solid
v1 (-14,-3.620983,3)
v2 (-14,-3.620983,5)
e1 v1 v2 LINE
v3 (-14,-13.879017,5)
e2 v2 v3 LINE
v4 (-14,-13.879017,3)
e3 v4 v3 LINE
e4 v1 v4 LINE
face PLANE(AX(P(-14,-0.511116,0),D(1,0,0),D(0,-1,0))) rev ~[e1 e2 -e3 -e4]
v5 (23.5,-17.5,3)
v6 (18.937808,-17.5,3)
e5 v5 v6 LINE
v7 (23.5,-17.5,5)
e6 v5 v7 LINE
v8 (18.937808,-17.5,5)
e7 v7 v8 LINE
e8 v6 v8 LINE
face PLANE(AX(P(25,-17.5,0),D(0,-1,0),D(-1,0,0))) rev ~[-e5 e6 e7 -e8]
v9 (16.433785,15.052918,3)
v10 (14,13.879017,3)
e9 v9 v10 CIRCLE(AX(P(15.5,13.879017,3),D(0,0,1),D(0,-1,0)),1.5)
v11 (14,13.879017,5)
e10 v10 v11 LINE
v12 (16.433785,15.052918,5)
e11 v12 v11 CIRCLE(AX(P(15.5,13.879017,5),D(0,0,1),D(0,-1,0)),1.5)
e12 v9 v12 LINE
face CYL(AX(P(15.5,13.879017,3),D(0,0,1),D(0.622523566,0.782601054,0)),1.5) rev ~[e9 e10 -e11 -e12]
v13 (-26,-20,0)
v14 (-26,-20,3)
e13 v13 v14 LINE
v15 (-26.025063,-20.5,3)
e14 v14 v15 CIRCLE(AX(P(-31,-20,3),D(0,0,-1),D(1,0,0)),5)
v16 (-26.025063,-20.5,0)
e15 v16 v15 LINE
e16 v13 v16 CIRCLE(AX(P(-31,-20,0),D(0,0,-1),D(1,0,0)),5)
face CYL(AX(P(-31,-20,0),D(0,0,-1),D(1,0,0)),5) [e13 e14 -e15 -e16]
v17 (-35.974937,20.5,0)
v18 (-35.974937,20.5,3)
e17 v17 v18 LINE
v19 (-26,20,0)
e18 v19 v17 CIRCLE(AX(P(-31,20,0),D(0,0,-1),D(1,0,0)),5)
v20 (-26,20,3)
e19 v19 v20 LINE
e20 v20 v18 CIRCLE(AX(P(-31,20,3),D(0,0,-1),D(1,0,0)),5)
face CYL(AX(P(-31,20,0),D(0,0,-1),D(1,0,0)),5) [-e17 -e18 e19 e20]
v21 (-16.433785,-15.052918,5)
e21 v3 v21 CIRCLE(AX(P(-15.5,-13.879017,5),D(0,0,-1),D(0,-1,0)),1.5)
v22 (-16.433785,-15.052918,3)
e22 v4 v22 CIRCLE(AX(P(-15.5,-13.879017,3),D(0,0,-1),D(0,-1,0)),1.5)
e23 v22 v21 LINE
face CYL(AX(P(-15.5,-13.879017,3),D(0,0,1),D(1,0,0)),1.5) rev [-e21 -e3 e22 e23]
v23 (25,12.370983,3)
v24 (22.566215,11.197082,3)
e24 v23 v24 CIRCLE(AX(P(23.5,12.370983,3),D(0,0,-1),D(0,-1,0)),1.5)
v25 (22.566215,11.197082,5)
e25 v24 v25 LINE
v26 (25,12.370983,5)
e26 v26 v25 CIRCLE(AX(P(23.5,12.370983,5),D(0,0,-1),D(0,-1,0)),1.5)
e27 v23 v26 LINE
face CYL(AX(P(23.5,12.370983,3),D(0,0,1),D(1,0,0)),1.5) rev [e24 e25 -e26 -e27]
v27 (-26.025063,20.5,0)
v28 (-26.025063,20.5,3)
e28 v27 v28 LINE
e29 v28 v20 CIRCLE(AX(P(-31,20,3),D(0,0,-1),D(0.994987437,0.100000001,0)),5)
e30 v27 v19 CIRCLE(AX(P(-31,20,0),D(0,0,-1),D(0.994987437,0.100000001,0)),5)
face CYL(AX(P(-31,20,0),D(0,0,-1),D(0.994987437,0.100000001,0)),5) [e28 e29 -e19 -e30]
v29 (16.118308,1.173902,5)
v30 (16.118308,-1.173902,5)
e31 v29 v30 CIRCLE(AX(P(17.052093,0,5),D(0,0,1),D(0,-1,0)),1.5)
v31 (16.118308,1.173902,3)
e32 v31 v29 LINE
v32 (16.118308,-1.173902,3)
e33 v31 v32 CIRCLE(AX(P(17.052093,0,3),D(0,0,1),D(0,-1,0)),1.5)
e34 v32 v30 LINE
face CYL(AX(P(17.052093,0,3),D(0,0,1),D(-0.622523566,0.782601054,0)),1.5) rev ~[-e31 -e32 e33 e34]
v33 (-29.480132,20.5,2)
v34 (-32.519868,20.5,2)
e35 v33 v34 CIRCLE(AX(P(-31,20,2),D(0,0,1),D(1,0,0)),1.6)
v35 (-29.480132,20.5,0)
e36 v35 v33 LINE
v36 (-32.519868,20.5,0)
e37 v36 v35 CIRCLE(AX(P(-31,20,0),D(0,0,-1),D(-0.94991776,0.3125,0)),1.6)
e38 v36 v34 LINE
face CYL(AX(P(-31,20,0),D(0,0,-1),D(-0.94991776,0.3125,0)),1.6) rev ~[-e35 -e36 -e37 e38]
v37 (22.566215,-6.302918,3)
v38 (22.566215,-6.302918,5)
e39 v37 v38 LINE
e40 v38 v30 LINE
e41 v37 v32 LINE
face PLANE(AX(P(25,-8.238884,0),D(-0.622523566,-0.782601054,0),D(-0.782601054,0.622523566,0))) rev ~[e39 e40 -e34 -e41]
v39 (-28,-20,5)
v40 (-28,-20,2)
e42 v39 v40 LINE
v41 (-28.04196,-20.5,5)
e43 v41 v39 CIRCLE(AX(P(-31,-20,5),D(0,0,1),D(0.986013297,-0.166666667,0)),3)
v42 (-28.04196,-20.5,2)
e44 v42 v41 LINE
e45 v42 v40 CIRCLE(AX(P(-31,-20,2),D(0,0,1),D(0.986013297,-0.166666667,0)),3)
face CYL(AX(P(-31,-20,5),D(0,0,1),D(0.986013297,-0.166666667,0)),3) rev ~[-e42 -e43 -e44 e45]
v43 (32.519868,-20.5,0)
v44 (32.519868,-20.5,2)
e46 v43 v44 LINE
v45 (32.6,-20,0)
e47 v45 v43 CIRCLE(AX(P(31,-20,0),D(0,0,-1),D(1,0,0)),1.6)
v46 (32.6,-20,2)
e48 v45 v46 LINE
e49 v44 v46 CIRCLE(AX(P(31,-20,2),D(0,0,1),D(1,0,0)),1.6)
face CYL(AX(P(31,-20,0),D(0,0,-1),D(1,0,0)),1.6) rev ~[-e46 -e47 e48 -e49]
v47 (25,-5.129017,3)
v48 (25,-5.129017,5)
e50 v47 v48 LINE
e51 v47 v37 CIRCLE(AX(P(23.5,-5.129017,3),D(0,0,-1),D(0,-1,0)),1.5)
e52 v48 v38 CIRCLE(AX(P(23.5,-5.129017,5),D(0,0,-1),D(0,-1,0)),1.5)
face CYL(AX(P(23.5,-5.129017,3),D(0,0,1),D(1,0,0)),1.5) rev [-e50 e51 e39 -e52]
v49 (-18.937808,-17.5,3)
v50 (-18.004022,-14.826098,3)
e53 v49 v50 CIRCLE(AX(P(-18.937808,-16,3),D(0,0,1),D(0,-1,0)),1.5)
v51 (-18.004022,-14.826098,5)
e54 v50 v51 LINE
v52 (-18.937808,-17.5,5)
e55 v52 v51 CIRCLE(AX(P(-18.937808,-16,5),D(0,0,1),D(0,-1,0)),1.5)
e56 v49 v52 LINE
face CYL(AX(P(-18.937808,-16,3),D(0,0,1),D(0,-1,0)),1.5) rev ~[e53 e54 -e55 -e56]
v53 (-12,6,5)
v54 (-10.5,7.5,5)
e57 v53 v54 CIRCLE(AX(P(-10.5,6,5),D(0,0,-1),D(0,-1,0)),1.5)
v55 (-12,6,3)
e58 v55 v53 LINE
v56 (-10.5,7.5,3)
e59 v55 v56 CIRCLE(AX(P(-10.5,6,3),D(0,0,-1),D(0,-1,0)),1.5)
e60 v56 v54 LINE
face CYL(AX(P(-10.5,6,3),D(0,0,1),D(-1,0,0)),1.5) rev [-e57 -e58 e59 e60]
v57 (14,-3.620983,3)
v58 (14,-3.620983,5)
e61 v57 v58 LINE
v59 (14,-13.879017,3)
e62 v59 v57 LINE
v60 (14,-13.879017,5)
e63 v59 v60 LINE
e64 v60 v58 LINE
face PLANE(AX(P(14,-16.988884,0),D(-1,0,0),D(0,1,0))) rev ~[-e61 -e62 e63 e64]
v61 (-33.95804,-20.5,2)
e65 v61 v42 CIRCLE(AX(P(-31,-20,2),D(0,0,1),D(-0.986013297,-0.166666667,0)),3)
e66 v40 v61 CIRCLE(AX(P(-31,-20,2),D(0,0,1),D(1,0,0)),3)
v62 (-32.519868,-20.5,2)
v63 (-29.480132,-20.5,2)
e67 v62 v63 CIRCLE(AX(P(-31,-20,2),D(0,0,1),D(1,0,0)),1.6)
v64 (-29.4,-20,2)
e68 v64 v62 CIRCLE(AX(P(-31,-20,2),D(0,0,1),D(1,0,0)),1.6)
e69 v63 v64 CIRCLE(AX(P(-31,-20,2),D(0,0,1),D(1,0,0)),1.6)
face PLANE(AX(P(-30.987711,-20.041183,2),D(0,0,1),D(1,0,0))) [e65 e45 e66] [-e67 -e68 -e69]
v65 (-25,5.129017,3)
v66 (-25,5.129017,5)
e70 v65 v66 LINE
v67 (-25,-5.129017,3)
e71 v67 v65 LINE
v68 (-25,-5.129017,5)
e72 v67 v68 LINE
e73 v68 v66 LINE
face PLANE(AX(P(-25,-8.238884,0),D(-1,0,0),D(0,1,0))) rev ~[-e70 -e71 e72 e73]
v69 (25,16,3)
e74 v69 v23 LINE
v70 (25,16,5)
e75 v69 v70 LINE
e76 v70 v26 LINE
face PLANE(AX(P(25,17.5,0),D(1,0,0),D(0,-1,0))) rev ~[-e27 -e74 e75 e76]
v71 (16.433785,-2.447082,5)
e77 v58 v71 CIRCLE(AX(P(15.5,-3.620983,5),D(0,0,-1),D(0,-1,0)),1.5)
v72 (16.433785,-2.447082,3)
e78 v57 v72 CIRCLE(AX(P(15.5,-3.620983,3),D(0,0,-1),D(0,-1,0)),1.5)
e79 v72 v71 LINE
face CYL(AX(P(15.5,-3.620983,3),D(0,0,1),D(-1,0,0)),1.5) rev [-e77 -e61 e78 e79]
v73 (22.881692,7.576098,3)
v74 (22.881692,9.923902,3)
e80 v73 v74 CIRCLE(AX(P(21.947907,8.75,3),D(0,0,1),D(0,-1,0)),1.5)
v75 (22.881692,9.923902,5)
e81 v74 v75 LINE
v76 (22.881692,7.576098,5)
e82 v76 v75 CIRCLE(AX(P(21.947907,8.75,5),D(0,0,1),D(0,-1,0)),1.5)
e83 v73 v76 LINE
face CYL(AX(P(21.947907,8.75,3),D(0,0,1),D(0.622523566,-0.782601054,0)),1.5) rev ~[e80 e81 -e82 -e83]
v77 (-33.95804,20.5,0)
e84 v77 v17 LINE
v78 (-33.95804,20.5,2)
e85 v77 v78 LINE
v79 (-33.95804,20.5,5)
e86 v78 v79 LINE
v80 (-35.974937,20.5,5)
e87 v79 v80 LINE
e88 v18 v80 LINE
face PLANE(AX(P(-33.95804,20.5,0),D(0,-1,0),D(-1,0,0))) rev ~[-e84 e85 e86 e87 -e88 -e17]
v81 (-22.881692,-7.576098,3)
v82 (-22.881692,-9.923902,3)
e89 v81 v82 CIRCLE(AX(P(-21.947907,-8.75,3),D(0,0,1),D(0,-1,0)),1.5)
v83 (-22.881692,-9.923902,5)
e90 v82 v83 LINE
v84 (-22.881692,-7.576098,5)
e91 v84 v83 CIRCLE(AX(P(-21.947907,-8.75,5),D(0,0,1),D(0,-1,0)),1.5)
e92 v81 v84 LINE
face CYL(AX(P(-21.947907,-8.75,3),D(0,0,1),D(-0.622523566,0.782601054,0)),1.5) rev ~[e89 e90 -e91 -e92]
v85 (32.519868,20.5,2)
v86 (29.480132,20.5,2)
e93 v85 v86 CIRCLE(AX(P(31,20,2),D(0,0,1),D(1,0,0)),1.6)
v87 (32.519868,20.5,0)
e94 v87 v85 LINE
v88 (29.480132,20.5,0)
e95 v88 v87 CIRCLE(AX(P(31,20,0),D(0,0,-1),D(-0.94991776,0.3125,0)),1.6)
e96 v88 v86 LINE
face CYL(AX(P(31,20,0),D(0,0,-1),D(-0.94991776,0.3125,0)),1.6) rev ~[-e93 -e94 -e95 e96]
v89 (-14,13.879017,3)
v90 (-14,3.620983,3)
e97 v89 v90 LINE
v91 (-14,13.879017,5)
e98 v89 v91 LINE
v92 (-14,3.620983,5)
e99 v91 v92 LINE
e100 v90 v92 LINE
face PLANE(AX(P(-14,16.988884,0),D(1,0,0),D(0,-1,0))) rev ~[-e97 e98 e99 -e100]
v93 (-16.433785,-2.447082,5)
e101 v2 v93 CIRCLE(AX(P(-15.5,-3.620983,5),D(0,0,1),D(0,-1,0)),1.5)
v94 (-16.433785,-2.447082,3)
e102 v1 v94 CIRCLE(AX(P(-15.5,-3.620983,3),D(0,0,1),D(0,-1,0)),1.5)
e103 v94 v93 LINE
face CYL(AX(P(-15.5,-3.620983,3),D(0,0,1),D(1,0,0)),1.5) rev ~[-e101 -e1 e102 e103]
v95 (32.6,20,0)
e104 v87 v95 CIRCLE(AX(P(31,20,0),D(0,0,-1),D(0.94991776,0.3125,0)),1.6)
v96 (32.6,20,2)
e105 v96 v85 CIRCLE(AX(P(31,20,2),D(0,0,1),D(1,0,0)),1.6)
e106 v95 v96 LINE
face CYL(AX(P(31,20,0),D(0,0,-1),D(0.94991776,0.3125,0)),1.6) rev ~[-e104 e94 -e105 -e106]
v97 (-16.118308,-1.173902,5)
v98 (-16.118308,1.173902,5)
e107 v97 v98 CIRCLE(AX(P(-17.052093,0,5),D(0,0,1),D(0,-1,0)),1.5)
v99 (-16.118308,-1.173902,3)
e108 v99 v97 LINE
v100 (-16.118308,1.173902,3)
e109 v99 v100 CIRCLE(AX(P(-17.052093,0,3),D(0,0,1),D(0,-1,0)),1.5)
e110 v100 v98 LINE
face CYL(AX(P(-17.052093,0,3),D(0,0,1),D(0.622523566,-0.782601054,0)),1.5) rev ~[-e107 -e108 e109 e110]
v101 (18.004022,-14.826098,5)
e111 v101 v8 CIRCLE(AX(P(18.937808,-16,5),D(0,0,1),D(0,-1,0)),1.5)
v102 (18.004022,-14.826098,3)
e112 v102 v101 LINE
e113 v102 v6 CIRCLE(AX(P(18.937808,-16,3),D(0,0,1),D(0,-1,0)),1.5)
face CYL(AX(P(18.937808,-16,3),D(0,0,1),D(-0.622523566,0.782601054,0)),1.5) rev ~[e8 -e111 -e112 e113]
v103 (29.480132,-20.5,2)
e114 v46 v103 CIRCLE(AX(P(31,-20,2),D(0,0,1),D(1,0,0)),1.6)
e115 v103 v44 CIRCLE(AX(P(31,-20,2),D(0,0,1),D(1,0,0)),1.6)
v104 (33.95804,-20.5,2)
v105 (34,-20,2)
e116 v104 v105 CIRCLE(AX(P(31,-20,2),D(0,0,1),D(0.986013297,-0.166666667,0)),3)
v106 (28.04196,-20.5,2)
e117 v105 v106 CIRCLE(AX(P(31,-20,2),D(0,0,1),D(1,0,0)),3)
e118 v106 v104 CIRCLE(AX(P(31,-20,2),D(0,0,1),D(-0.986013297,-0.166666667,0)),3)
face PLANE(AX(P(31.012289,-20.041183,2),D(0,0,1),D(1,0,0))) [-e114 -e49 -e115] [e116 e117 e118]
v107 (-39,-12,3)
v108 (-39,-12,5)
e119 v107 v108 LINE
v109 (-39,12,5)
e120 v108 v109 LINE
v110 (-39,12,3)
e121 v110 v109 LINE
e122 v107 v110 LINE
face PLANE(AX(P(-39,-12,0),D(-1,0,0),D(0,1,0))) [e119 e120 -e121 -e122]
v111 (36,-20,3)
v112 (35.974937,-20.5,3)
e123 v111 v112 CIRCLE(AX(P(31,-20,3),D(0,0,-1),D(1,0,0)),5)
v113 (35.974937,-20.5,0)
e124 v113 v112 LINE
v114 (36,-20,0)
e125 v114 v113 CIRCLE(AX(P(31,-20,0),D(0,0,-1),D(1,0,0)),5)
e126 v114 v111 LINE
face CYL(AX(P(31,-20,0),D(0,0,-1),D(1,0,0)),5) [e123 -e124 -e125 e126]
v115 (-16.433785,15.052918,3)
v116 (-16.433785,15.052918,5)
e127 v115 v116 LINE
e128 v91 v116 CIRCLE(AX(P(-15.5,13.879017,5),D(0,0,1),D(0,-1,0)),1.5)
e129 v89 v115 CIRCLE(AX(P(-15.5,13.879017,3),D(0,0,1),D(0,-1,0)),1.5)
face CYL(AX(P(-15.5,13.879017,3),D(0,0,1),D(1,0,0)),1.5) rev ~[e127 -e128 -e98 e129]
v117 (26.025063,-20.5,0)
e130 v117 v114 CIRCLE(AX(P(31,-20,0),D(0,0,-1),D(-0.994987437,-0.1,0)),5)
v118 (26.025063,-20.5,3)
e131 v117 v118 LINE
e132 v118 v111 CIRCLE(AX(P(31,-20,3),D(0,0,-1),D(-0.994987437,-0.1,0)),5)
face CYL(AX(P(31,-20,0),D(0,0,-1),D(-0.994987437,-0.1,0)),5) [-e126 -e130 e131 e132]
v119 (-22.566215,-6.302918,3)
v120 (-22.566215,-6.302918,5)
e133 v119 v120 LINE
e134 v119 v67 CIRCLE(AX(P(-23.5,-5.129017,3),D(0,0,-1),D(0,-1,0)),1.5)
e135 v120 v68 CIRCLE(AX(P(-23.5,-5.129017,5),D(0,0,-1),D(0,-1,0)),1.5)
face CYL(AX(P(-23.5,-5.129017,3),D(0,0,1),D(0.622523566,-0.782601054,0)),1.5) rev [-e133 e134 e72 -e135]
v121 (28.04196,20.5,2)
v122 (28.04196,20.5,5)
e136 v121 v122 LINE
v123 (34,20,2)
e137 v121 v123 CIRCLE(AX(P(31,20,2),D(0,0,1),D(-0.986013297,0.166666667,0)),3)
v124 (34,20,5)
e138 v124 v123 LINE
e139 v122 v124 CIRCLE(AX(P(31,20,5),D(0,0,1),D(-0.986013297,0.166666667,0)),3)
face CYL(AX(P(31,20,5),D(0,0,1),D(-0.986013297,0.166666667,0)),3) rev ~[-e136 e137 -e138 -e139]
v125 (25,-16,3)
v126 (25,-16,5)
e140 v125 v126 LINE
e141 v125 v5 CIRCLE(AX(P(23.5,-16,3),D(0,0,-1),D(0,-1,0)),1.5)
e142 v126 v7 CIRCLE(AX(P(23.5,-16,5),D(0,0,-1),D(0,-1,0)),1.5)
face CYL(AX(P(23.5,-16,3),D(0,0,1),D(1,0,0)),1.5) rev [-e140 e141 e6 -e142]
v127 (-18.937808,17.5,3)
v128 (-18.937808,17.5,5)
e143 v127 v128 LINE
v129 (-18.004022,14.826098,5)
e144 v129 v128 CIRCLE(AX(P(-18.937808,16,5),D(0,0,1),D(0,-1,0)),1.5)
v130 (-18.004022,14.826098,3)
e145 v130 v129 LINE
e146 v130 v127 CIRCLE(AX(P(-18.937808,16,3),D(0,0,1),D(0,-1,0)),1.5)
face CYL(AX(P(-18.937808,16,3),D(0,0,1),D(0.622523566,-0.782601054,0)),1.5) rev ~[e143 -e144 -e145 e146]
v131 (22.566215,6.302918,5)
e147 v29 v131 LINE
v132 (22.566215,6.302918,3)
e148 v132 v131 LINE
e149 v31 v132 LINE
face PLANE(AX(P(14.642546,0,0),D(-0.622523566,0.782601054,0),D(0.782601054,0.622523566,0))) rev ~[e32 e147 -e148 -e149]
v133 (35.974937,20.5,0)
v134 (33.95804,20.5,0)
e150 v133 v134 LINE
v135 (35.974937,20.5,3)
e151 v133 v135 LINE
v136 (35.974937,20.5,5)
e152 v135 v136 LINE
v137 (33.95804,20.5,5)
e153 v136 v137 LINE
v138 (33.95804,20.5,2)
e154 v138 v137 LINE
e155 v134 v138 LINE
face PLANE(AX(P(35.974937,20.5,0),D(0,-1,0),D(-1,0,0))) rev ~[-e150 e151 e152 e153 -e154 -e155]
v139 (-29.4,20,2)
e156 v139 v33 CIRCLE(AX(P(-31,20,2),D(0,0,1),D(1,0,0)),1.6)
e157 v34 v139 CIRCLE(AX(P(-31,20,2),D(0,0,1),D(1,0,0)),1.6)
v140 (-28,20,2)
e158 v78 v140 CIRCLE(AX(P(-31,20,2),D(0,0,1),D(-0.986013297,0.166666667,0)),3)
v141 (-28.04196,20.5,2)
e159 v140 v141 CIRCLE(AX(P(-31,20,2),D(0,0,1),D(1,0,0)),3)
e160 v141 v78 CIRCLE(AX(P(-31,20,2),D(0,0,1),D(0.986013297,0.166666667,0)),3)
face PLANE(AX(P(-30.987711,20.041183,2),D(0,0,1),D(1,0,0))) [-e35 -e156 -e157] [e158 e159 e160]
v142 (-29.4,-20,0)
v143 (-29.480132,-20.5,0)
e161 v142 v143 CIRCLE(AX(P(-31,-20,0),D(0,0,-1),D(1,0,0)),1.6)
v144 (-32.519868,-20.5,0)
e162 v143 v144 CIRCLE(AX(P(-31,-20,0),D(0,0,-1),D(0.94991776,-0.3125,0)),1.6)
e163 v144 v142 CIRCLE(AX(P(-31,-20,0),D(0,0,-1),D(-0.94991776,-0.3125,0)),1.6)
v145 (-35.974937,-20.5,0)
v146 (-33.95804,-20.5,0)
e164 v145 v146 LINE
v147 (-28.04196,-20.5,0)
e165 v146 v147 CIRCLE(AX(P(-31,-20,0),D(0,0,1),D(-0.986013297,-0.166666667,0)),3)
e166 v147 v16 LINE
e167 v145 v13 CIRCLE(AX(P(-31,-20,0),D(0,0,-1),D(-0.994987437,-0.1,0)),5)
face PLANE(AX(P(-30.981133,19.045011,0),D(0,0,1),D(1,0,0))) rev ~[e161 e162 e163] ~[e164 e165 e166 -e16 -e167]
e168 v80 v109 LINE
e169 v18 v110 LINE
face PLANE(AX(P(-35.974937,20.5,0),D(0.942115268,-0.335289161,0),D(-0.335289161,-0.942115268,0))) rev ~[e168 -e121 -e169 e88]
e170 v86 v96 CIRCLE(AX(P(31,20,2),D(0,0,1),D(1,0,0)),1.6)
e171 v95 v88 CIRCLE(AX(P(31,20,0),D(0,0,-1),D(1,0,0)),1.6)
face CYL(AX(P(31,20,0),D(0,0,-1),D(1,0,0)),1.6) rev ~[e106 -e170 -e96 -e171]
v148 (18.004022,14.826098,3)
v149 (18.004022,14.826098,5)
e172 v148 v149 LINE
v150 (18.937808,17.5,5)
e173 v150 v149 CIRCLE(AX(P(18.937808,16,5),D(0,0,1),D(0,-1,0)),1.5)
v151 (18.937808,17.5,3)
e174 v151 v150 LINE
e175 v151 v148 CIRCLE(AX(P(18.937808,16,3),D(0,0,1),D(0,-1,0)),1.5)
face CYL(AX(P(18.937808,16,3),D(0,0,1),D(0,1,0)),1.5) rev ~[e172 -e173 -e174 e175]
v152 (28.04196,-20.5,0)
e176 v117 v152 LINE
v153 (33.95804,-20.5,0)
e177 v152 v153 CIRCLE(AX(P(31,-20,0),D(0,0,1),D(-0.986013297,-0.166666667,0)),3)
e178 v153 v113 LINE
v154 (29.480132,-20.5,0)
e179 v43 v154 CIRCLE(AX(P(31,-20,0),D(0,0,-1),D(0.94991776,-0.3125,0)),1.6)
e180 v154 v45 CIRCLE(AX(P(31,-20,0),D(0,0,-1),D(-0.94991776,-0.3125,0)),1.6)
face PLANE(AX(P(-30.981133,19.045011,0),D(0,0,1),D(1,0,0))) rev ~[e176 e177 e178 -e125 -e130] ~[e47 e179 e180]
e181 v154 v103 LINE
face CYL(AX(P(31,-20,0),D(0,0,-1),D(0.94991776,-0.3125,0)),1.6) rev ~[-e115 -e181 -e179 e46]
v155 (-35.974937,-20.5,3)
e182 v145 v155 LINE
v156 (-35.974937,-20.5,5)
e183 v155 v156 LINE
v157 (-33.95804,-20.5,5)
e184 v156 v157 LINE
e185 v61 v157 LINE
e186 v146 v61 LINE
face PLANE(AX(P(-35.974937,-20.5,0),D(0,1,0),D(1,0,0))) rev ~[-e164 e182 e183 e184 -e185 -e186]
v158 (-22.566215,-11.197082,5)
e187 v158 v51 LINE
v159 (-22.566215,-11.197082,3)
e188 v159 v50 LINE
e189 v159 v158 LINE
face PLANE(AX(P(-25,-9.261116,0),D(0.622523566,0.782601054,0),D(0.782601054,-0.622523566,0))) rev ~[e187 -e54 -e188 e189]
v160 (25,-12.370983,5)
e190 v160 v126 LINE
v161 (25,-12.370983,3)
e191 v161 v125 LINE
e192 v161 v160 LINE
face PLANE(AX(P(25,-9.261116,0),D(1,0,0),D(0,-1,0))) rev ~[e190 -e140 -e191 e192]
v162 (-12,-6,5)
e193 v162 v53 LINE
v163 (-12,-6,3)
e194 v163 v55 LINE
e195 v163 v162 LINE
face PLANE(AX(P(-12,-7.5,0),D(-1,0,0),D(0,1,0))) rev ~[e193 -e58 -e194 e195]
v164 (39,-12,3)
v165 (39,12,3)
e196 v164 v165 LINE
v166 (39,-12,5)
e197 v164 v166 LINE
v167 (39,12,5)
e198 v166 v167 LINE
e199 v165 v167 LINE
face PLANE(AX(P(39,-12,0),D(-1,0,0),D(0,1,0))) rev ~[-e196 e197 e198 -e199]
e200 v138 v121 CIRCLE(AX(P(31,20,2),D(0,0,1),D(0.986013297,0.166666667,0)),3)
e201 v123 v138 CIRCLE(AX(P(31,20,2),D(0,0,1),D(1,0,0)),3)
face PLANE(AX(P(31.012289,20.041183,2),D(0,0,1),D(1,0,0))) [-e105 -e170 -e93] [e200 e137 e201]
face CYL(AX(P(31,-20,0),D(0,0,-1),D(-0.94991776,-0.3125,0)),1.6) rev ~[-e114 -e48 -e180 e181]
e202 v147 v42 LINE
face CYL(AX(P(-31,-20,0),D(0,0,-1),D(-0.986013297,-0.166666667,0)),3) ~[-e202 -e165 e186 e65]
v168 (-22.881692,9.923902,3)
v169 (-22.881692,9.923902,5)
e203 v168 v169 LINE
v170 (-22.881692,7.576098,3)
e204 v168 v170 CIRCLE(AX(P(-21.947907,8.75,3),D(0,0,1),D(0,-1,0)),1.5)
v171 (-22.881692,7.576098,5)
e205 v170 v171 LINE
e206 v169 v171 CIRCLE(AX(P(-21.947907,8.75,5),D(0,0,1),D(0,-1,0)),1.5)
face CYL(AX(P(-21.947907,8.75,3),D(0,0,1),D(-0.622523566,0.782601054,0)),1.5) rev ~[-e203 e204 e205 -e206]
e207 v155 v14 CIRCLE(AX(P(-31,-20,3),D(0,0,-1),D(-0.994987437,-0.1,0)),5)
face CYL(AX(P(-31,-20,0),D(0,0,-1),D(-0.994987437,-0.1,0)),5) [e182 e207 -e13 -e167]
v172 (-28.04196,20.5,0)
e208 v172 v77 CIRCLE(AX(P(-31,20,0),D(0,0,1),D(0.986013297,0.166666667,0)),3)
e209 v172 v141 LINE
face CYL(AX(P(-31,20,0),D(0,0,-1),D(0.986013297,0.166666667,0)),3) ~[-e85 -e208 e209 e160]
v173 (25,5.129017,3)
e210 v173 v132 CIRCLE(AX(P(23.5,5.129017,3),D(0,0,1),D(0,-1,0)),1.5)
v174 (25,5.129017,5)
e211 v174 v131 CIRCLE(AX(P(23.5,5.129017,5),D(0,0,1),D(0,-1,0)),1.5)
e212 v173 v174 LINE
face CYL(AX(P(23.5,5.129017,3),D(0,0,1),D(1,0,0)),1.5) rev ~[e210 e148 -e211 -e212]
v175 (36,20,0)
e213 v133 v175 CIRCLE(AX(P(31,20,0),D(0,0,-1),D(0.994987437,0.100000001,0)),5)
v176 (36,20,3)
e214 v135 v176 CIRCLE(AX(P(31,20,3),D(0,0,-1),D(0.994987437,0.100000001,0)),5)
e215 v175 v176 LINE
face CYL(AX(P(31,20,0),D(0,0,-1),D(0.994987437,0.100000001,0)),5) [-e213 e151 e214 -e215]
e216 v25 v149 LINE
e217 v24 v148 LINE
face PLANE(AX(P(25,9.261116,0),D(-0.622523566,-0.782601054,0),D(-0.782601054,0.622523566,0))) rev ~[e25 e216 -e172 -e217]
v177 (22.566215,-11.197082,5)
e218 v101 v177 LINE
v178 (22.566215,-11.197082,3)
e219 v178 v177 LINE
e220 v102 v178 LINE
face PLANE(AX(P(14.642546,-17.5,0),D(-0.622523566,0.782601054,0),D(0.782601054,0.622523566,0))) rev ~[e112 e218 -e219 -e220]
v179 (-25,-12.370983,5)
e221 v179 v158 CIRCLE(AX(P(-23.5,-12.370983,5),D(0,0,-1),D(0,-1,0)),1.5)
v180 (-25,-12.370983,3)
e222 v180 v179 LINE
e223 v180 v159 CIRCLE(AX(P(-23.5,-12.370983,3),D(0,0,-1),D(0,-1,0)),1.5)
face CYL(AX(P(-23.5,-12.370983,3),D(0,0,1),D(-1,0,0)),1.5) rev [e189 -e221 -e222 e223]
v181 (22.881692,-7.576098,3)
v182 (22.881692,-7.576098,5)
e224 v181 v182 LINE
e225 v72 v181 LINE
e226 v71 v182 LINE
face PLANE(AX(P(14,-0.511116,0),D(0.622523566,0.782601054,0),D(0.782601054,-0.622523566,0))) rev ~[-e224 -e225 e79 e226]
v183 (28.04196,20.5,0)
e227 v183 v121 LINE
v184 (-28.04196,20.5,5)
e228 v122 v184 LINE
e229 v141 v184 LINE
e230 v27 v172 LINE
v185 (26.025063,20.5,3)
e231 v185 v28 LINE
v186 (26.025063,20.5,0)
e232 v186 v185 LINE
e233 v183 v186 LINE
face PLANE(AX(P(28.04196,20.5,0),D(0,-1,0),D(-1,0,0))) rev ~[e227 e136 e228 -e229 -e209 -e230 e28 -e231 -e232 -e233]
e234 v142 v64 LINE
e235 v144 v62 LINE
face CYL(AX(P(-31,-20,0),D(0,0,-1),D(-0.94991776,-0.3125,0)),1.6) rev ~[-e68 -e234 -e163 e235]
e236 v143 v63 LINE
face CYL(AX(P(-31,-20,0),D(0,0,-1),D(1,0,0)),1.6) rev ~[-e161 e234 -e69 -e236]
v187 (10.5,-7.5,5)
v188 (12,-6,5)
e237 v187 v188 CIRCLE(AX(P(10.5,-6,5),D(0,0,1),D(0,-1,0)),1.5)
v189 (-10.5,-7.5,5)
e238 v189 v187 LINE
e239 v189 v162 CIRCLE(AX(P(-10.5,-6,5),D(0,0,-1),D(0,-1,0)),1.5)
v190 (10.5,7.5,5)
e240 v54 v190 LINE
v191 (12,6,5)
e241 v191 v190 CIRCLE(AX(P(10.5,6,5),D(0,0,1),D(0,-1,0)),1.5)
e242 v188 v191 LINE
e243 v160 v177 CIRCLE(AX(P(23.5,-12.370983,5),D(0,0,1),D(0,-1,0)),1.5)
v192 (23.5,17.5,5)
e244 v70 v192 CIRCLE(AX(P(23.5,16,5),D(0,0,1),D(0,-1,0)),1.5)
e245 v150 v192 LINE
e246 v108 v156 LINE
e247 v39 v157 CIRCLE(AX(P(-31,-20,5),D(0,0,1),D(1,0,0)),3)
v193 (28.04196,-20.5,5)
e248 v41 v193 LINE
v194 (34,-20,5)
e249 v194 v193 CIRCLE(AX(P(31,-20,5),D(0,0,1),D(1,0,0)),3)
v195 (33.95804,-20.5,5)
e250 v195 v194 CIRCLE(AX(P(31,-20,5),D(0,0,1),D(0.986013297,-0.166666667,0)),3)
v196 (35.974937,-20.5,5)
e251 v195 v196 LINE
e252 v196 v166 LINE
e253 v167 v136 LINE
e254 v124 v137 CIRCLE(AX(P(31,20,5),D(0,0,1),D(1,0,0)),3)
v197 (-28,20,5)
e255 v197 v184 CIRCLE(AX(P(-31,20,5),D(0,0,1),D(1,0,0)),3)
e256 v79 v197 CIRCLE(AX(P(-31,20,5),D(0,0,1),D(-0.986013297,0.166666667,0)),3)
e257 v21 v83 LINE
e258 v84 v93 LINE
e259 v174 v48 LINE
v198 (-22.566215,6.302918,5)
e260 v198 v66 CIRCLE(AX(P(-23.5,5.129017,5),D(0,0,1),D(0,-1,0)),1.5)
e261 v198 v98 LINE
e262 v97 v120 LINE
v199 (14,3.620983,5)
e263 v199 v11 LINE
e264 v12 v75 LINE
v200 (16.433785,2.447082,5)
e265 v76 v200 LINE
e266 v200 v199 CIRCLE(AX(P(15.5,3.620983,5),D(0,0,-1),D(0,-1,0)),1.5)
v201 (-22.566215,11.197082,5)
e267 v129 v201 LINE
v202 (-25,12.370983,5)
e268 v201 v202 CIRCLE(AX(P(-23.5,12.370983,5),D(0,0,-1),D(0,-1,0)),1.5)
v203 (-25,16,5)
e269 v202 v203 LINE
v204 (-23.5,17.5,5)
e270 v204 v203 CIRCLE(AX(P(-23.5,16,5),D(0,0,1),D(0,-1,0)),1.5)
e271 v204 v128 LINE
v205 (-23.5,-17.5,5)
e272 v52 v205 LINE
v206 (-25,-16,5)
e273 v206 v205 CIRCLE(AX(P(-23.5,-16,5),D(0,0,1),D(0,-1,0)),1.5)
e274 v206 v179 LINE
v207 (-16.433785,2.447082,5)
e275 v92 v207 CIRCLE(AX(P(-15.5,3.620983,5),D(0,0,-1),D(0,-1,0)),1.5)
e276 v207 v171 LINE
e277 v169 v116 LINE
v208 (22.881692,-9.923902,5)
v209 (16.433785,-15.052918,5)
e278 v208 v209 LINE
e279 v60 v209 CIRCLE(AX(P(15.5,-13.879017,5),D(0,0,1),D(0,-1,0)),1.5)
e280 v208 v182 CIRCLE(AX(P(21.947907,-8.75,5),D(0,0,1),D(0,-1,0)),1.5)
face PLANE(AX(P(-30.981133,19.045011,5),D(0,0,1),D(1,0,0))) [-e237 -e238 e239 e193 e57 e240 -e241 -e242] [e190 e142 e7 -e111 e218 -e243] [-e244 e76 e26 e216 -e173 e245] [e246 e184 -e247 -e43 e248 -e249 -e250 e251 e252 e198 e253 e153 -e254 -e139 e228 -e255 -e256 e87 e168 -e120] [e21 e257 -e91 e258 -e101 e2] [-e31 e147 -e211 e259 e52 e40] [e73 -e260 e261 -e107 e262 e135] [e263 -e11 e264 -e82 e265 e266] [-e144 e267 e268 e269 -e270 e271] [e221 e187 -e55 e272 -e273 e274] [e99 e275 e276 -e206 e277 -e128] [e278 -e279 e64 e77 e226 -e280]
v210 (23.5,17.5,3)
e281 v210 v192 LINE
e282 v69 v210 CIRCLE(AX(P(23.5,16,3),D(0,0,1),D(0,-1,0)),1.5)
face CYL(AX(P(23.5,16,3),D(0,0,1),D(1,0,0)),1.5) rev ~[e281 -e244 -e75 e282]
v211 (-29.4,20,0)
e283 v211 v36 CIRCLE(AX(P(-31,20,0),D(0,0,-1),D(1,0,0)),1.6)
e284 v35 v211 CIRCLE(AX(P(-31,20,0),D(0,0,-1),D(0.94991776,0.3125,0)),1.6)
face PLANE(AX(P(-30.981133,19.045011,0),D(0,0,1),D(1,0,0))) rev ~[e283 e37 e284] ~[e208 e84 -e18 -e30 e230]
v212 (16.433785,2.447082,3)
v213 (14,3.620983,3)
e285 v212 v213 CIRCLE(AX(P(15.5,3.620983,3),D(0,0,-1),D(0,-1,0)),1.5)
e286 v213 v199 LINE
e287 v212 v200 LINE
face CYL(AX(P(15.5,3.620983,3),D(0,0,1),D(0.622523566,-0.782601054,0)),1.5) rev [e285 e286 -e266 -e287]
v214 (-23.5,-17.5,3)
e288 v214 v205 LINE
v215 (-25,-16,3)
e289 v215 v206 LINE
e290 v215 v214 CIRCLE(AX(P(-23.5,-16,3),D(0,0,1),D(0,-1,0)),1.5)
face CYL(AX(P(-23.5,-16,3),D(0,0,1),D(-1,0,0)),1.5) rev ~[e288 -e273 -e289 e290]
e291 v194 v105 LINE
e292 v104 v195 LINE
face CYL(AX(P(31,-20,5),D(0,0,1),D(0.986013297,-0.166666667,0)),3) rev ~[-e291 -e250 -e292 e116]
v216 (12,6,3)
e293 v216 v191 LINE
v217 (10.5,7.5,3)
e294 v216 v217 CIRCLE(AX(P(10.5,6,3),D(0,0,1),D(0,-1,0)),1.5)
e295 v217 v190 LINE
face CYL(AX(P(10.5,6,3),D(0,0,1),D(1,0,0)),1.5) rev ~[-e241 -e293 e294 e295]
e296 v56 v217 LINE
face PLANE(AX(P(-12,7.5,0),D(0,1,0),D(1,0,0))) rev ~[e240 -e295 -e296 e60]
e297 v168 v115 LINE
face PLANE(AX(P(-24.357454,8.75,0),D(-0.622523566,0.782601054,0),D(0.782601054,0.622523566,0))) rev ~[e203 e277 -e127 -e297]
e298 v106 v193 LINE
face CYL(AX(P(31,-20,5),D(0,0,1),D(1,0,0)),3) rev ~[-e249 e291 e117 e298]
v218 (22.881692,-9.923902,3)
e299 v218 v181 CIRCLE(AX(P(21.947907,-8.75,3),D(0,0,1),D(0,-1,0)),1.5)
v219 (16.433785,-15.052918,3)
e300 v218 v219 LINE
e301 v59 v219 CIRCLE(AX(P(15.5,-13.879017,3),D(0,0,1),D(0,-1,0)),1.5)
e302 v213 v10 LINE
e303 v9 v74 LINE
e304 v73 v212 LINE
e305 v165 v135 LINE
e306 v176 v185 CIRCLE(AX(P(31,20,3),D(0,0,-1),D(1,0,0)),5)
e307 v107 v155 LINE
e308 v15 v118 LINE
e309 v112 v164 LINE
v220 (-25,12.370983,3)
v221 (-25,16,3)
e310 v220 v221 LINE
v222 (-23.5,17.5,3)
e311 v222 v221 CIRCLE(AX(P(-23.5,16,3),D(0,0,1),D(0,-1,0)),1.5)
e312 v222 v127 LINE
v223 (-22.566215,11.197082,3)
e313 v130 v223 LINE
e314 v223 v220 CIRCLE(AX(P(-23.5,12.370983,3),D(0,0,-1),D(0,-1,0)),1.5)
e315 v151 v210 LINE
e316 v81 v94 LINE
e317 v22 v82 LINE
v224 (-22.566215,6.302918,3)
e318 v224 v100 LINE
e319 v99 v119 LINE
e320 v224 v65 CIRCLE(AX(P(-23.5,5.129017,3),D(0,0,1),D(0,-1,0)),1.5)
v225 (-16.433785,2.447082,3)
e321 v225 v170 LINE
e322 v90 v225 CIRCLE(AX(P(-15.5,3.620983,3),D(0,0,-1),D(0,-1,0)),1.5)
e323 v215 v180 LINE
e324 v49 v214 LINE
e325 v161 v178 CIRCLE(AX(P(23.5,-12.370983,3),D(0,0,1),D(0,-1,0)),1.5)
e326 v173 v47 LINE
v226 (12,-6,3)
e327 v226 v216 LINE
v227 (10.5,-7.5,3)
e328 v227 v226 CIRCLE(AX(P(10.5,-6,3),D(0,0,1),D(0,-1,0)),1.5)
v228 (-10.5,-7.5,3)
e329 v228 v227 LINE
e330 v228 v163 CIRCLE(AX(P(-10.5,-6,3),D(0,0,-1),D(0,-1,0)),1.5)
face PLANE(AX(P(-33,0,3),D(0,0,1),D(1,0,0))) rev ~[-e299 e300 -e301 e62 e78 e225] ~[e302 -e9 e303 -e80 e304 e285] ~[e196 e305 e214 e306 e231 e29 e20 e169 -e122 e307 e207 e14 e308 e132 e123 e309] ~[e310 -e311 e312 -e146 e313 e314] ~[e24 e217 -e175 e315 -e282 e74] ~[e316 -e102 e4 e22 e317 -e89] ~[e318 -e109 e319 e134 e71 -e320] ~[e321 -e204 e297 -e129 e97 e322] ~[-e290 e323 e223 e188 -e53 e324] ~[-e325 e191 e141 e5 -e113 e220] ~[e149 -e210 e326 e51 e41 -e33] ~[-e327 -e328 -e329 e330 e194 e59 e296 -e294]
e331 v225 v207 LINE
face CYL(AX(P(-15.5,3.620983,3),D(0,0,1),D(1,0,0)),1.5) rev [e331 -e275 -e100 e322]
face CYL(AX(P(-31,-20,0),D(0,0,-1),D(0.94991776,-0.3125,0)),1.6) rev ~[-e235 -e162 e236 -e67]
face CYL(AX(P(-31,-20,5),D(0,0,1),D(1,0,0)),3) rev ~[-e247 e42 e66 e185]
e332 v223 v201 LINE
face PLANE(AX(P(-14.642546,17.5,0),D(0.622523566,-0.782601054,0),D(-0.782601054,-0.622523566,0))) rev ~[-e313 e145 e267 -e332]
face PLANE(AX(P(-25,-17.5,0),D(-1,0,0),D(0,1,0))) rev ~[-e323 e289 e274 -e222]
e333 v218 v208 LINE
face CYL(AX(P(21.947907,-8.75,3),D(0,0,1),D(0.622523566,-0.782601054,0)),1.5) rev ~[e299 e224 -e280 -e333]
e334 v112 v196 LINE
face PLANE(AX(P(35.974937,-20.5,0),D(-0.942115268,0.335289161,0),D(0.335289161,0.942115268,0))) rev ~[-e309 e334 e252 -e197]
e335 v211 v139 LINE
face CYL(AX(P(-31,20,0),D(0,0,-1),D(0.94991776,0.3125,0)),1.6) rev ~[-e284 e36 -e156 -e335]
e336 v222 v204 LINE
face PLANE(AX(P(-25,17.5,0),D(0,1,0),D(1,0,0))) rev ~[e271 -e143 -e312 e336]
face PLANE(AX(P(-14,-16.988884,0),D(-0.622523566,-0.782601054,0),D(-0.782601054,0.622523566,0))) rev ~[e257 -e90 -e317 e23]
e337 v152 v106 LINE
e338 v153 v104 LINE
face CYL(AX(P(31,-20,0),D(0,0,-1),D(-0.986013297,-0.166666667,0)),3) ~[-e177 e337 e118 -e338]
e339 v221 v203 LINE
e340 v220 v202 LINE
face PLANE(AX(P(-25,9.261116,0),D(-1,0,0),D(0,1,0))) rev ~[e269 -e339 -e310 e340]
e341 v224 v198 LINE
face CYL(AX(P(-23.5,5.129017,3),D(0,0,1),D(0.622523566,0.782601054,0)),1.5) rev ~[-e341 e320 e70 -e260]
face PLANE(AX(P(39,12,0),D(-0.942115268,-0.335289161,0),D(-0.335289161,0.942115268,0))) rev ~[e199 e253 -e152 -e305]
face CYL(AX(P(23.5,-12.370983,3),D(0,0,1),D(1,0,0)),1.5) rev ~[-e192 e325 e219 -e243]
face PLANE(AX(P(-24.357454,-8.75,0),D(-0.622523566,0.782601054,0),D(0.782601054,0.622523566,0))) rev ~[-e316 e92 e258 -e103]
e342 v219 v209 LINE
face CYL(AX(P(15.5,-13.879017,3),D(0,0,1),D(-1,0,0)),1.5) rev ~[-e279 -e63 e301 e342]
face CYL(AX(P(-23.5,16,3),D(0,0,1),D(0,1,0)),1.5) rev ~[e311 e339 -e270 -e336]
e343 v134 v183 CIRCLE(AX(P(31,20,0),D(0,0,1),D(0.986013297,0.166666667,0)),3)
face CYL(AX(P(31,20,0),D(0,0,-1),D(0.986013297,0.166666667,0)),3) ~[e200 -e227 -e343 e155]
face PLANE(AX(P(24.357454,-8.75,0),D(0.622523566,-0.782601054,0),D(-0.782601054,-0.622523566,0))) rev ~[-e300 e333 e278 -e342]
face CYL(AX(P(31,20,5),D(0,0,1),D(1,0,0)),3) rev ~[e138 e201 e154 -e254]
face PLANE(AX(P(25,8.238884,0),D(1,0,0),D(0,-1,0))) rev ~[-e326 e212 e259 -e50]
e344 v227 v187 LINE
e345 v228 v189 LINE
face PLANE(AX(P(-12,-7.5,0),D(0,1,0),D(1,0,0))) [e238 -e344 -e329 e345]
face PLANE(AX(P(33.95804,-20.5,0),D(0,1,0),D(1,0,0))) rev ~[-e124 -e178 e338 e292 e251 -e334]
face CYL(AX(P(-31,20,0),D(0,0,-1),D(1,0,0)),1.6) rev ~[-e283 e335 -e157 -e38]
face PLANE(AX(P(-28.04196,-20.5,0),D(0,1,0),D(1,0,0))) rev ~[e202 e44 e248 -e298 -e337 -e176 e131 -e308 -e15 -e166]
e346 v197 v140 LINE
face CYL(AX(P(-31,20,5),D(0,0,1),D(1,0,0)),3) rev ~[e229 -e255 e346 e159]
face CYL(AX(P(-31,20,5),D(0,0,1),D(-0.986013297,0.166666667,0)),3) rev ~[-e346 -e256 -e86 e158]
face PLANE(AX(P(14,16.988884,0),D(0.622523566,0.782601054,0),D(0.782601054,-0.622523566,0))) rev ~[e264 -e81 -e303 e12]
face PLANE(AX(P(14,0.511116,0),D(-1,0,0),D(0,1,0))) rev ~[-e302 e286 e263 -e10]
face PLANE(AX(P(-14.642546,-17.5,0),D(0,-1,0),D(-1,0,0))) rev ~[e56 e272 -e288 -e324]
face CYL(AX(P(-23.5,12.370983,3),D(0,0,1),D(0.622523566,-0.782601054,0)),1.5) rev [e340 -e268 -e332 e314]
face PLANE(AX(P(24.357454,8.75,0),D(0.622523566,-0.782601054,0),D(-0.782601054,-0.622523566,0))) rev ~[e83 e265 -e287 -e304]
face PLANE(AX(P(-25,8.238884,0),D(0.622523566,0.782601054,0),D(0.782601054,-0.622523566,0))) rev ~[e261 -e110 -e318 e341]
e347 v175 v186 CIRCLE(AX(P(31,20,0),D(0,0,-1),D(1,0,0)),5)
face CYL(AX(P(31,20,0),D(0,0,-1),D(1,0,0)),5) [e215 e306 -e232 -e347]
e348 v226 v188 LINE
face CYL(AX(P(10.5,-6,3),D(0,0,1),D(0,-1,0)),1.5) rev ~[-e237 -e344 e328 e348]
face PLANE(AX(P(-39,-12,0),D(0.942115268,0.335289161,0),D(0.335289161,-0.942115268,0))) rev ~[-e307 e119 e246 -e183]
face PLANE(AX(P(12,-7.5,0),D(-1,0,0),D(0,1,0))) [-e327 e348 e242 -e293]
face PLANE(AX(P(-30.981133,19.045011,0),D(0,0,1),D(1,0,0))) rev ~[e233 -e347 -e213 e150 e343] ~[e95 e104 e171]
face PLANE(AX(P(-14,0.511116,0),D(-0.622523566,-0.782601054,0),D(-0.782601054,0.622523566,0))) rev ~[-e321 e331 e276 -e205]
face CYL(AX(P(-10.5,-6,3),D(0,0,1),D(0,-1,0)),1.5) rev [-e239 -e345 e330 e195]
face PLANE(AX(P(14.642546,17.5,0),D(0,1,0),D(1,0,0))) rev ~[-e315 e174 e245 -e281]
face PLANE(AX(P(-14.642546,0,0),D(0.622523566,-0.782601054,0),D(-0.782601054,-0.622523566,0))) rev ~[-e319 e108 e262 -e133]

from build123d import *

# Parameters (mm, degrees)
F0_W     = 24
F0_H     = 15
F0_H_2   = 12
F0_W_2   = 12
F0_H_3   = 24
F1_DEPTH = 5
F2_DEPTH = 3
F3_R     = 1.6
F4_DEPTH = 3
F5_R     = 1.5


with BuildPart() as f1:
    # F0 (on Top) → F1 (new body)
    with BuildSketch(Plane.XY):
        with BuildLine():
            ThreePointArc((-29.4801315846, 20.5), (-29.4201599029, 20.2531901809), (-29.4, 20))
            ThreePointArc((-29.4, 20), (-31.2531901809, 18.4201599029), (-32.5198684154, 20.5))
            Line((-32.5198684154, 20.5), (-33.9580398915, 20.5))
            ThreePointArc((-33.9580398915, 20.5), (-31.2508787808, 17.0105084316), (-28, 20))
            ThreePointArc((-28, 20), (-28.0105084316, 20.2508787808), (-28.0419601085, 20.5))
            Line((-28.0419601085, 20.5), (-29.4801315846, 20.5))
        make_face()
        with BuildLine():
            ThreePointArc((-32.5198684154, 20.5), (-31, 21.6), (-29.4801315846, 20.5))
            Line((-29.4801315846, 20.5), (-28.0419601085, 20.5))
            ThreePointArc((-28.0419601085, 20.5), (-31, 23), (-33.9580398915, 20.5))
            Line((-33.9580398915, 20.5), (-32.5198684154, 20.5))
        make_face()
        with BuildLine():
            Line((-26.0250628145, 20.5), (-28.0419601085, 20.5))
            ThreePointArc((-28.0419601085, 20.5), (-28.0105084316, 20.2508787808), (-28, 20))
            ThreePointArc((-28, 20), (-31.2508787808, 17.0105084316), (-33.9580398915, 20.5))
            Line((-33.9580398915, 20.5), (-35.9749371855, 20.5))
            ThreePointArc((-35.9749371855, 20.5), (-31.2503138753, 15.0062696344), (-26, 20))
            ThreePointArc((-26, 20), (-26.0062696344, 20.2503138753), (-26.0250628145, 20.5))
        make_face()
        with BuildLine():
            Line((-12, 20.5), (-26.0250628145, 20.5))
            ThreePointArc((-26.0250628145, 20.5), (-26.0062696344, 20.2503138753), (-26, 20))
            ThreePointArc((-26, 20), (-31.2503138753, 15.0062696344), (-35.9749371855, 20.5))
            Line((-35.9749371855, 20.5), (-39, 12))
            Line((-39, 12), (-27, 12))
            Line((-27, 12), (-27, -12))
            Line((-27, -12), (-39, -12))
            Line((-39, -12), (-35.9749371855, -20.5))
            ThreePointArc((-35.9749371855, -20.5), (-31.2503138753, -15.0062696344), (-26, -20))
            ThreePointArc((-26, -20), (-26.0062696344, -20.2503138753), (-26.0250628145, -20.5))
            Line((-26.0250628145, -20.5), (-12, -20.5))
            Line((-12, -20.5), (-12, -8.5))
            Line((-12, -8.5), (12, -8.5))
            Line((12, -8.5), (12, -20.5))
            Line((12, -20.5), (26.0250628145, -20.5))
            ThreePointArc((26.0250628145, -20.5), (30.7496861247, -15.0062696344), (36, -20))
            ThreePointArc((36, -20), (35.9937303656, -20.2503138753), (35.9749371855, -20.5))
            Line((35.9749371855, -20.5), (39, -12))
            Line((39, -12), (27, -12))
            Line((27, -12), (27, 12))
            Line((27, 12), (39, 12))
            Line((39, 12), (35.9749371855, 20.5))
            ThreePointArc((35.9749371855, 20.5), (35.9937303656, 20.2503138753), (36, 20))
            ThreePointArc((36, 20), (30.7496861247, 15.0062696344), (26.0250628145, 20.5))
            Line((26.0250628145, 20.5), (12, 20.5))
            Line((12, 20.5), (12, 8.5))
            Line((12, 8.5), (-12, 8.5))
            Line((-12, 8.5), (-12, 20.5))
        make_face()
        Polygon((-14.6425459564, 17.5), (-14, 17.5), (-14, 16.9888838983), (-14, 0.5111161017), (-13.3574540436, 0), (-14, -0.5111161017), (-14, -16.9888838983), (-14, -17.5), (-14.6425459564, -17.5), (-25, -17.5), (-25, -9.2611161017), (-25.6425459564, -8.75), (-25, -8.2388838983), (-25, 8.2388838983), (-25.6425459564, 8.75), (-25, 9.2611161017), (-25, 17.5), align=None, mode=Mode.SUBTRACT)
        Rectangle(F0_W, F0_H, mode=Mode.SUBTRACT)
        Polygon((14, 16.9888838983), (14, 17.5), (14.6425459564, 17.5), (25, 17.5), (25, 9.2611161017), (25.6425459564, 8.75), (25, 8.2388838983), (25, -8.2388838983), (25.6425459564, -8.75), (25, -9.2611161017), (25, -17.5), (14.6425459564, -17.5), (14, -17.5), (14, -16.9888838983), (14, -0.5111161017), (13.3574540436, 0), (14, 0.5111161017), align=None, mode=Mode.SUBTRACT)
        with Locations((0, 14.5)):
            Rectangle(F0_W, F0_H_2)
        with Locations((-33, 0)):
            Rectangle(F0_W_2, F0_H_3)
        with BuildLine():
            Line((28.0419601085, 20.5), (26.0250628145, 20.5))
            ThreePointArc((26.0250628145, 20.5), (30.7496861247, 15.0062696344), (36, 20))
            ThreePointArc((36, 20), (35.9937303656, 20.2503138753), (35.9749371855, 20.5))
            Line((35.9749371855, 20.5), (33.9580398915, 20.5))
            ThreePointArc((33.9580398915, 20.5), (33.9894915684, 20.2508787808), (34, 20))
            ThreePointArc((34, 20), (30.7491212192, 17.0105084316), (28.0419601085, 20.5))
        make_face()
        with BuildLine():
            ThreePointArc((-26, -20), (-31.2503138753, -15.0062696344), (-35.9749371855, -20.5))
            Line((-35.9749371855, -20.5), (-33.9580398915, -20.5))
            ThreePointArc((-33.9580398915, -20.5), (-31.2508787808, -17.0105084316), (-28, -20))
            ThreePointArc((-28, -20), (-28.0105084316, -20.2508787808), (-28.0419601085, -20.5))
            Line((-28.0419601085, -20.5), (-26.0250628145, -20.5))
            ThreePointArc((-26.0250628145, -20.5), (-26.0062696344, -20.2503138753), (-26, -20))
        make_face()
        with BuildLine():
            ThreePointArc((33.9580398915, 20.5), (31, 23), (28.0419601085, 20.5))
            Line((28.0419601085, 20.5), (29.4801315846, 20.5))
            ThreePointArc((29.4801315846, 20.5), (31, 21.6), (32.5198684154, 20.5))
            Line((32.5198684154, 20.5), (33.9580398915, 20.5))
        make_face()
        with BuildLine():
            Line((29.4801315846, 20.5), (28.0419601085, 20.5))
            ThreePointArc((28.0419601085, 20.5), (30.7491212192, 17.0105084316), (34, 20))
            ThreePointArc((34, 20), (33.9894915684, 20.2508787808), (33.9580398915, 20.5))
            Line((33.9580398915, 20.5), (32.5198684154, 20.5))
            ThreePointArc((32.5198684154, 20.5), (32.5798400971, 20.2531901809), (32.6, 20))
            ThreePointArc((32.6, 20), (30.7468098191, 18.4201599029), (29.4801315846, 20.5))
        make_face()
        with BuildLine():
            ThreePointArc((-28, -20), (-31.2508787808, -17.0105084316), (-33.9580398915, -20.5))
            Line((-33.9580398915, -20.5), (-32.5198684154, -20.5))
            ThreePointArc((-32.5198684154, -20.5), (-31.2531901809, -18.4201599029), (-29.4, -20))
            ThreePointArc((-29.4, -20), (-29.4201599029, -20.2531901809), (-29.4801315846, -20.5))
            Line((-29.4801315846, -20.5), (-28.0419601085, -20.5))
            ThreePointArc((-28.0419601085, -20.5), (-28.0105084316, -20.2508787808), (-28, -20))
        make_face()
        with BuildLine():
            Line((-32.5198684154, -20.5), (-33.9580398915, -20.5))
            ThreePointArc((-33.9580398915, -20.5), (-31, -23), (-28.0419601085, -20.5))
            Line((-28.0419601085, -20.5), (-29.4801315846, -20.5))
            ThreePointArc((-29.4801315846, -20.5), (-31, -21.6), (-32.5198684154, -20.5))
        make_face()
        with Locations((33, 0)):
            Rectangle(F0_W_2, F0_H_3)
        with Locations((0, -14.5)):
            Rectangle(F0_W, F0_H_2)
        with BuildLine():
            Line((33.9580398915, -20.5), (35.9749371855, -20.5))
            ThreePointArc((35.9749371855, -20.5), (35.9937303656, -20.2503138753), (36, -20))
            ThreePointArc((36, -20), (30.7496861247, -15.0062696344), (26.0250628145, -20.5))
            Line((26.0250628145, -20.5), (28.0419601085, -20.5))
            ThreePointArc((28.0419601085, -20.5), (30.7491212192, -17.0105084316), (34, -20))
            ThreePointArc((34, -20), (33.9894915684, -20.2508787808), (33.9580398915, -20.5))
        make_face()
        with BuildLine():
            ThreePointArc((28.0419601085, -20.5), (31, -23), (33.9580398915, -20.5))
            Line((33.9580398915, -20.5), (32.5198684154, -20.5))
            ThreePointArc((32.5198684154, -20.5), (31, -21.6), (29.4801315846, -20.5))
            Line((29.4801315846, -20.5), (28.0419601085, -20.5))
        make_face()
        with BuildLine():
            Line((32.5198684154, -20.5), (33.9580398915, -20.5))
            ThreePointArc((33.9580398915, -20.5), (33.9894915684, -20.2508787808), (34, -20))
            ThreePointArc((34, -20), (30.7491212192, -17.0105084316), (28.0419601085, -20.5))
            Line((28.0419601085, -20.5), (29.4801315846, -20.5))
            ThreePointArc((29.4801315846, -20.5), (30.7468098191, -18.4201599029), (32.6, -20))
            ThreePointArc((32.6, -20), (32.5798400971, -20.2531901809), (32.5198684154, -20.5))
        make_face()
        Polygon((-25, 8.75), (-14, 17.5), (-14.6425459564, 17.5), (-25, 9.2611161017), align=None)
        Polygon((-14, 16.9888838983), (-14, 17.5), (-25, 8.75), (-14, 0), (-14, 0.5111161017), (-24.3574540436, 8.75), align=None)
        Polygon((-25, 8.2388838983), (-25, 8.75), (-25, 9.2611161017), (-25.6425459564, 8.75), align=None)
        Polygon((-14, 0), (-25, 8.75), (-25, 8.2388838983), (-14.6425459564, 0), (-25, -8.2388838983), (-25, -8.75), align=None)
        Polygon((-13.3574540436, 0), (-14, 0.5111161017), (-14, 0), (-14, -0.5111161017), align=None)
        Polygon((-14, -0.5111161017), (-14, 0), (-25, -8.75), (-14, -17.5), (-14, -16.9888838983), (-24.3574540436, -8.75), align=None)
        Polygon((-25, -8.75), (-25, -8.2388838983), (-25.6425459564, -8.75), (-25, -9.2611161017), align=None)
        Polygon((-14, -17.5), (-25, -8.75), (-25, -9.2611161017), (-14.6425459564, -17.5), align=None)
        Polygon((25, 8.75), (14, 17.5), (14, 16.9888838983), (24.3574540436, 8.75), (14, 0.5111161017), (14, 0), align=None)
        Polygon((14.6425459564, 17.5), (14, 17.5), (25, 8.75), (25, 9.2611161017), align=None)
        Polygon((25, 9.2611161017), (25, 8.75), (25, 8.2388838983), (25.6425459564, 8.75), align=None)
        Polygon((25, 8.2388838983), (25, 8.75), (14, 0), (25, -8.75), (25, -8.2388838983), (14.6425459564, 0), align=None)
        Polygon((14, 0), (14, 0.5111161017), (13.3574540436, 0), (14, -0.5111161017), align=None)
        Polygon((25, -8.75), (14, 0), (14, -0.5111161017), (24.3574540436, -8.75), (14, -16.9888838983), (14, -17.5), align=None)
        Polygon((25.6425459564, -8.75), (25, -8.2388838983), (25, -8.75), (25, -9.2611161017), align=None)
        Polygon((25, -9.2611161017), (25, -8.75), (14, -17.5), (14.6425459564, -17.5), align=None)
    extrude(amount=F1_DEPTH)

    # F0 (on Top) → F2 (cut)
    with BuildSketch(Plane.XY):
        with Locations((-33, 0)):
            Rectangle(F0_W_2, F0_H_3)
        with BuildLine():
            Line((-12, 20.5), (-26.0250628145, 20.5))
            ThreePointArc((-26.0250628145, 20.5), (-26.0062696344, 20.2503138753), (-26, 20))
            ThreePointArc((-26, 20), (-31.2503138753, 15.0062696344), (-35.9749371855, 20.5))
            Line((-35.9749371855, 20.5), (-39, 12))
            Line((-39, 12), (-27, 12))
            Line((-27, 12), (-27, -12))
            Line((-27, -12), (-39, -12))
            Line((-39, -12), (-35.9749371855, -20.5))
            ThreePointArc((-35.9749371855, -20.5), (-31.2503138753, -15.0062696344), (-26, -20))
            ThreePointArc((-26, -20), (-26.0062696344, -20.2503138753), (-26.0250628145, -20.5))
            Line((-26.0250628145, -20.5), (-12, -20.5))
            Line((-12, -20.5), (-12, -8.5))
            Line((-12, -8.5), (12, -8.5))
            Line((12, -8.5), (12, -20.5))
            Line((12, -20.5), (26.0250628145, -20.5))
            ThreePointArc((26.0250628145, -20.5), (30.7496861247, -15.0062696344), (36, -20))
            ThreePointArc((36, -20), (35.9937303656, -20.2503138753), (35.9749371855, -20.5))
            Line((35.9749371855, -20.5), (39, -12))
            Line((39, -12), (27, -12))
            Line((27, -12), (27, 12))
            Line((27, 12), (39, 12))
            Line((39, 12), (35.9749371855, 20.5))
            ThreePointArc((35.9749371855, 20.5), (35.9937303656, 20.2503138753), (36, 20))
            ThreePointArc((36, 20), (30.7496861247, 15.0062696344), (26.0250628145, 20.5))
            Line((26.0250628145, 20.5), (12, 20.5))
            Line((12, 20.5), (12, 8.5))
            Line((12, 8.5), (-12, 8.5))
            Line((-12, 8.5), (-12, 20.5))
        make_face()
        Polygon((-14.6425459564, 17.5), (-14, 17.5), (-14, 16.9888838983), (-14, 0.5111161017), (-13.3574540436, 0), (-14, -0.5111161017), (-14, -16.9888838983), (-14, -17.5), (-14.6425459564, -17.5), (-25, -17.5), (-25, -9.2611161017), (-25.6425459564, -8.75), (-25, -8.2388838983), (-25, 8.2388838983), (-25.6425459564, 8.75), (-25, 9.2611161017), (-25, 17.5), align=None, mode=Mode.SUBTRACT)
        Rectangle(F0_W, F0_H, mode=Mode.SUBTRACT)
        Polygon((14, 16.9888838983), (14, 17.5), (14.6425459564, 17.5), (25, 17.5), (25, 9.2611161017), (25.6425459564, 8.75), (25, 8.2388838983), (25, -8.2388838983), (25.6425459564, -8.75), (25, -9.2611161017), (25, -17.5), (14.6425459564, -17.5), (14, -17.5), (14, -16.9888838983), (14, -0.5111161017), (13.3574540436, 0), (14, 0.5111161017), align=None, mode=Mode.SUBTRACT)
        Polygon((-25, 8.2388838983), (-25, 8.75), (-25, 9.2611161017), (-25.6425459564, 8.75), align=None)
        Polygon((-25, -8.75), (-25, -8.2388838983), (-25.6425459564, -8.75), (-25, -9.2611161017), align=None)
        Polygon((-25, 8.75), (-14, 17.5), (-14.6425459564, 17.5), (-25, 9.2611161017), align=None)
        Polygon((-14, 16.9888838983), (-14, 17.5), (-25, 8.75), (-14, 0), (-14, 0.5111161017), (-24.3574540436, 8.75), align=None)
        Polygon((-14, -0.5111161017), (-14, 0), (-25, -8.75), (-14, -17.5), (-14, -16.9888838983), (-24.3574540436, -8.75), align=None)
        Polygon((-14, 0), (-25, 8.75), (-25, 8.2388838983), (-14.6425459564, 0), (-25, -8.2388838983), (-25, -8.75), align=None)
        Polygon((-13.3574540436, 0), (-14, 0.5111161017), (-14, 0), (-14, -0.5111161017), align=None)
        Polygon((-14, -17.5), (-25, -8.75), (-25, -9.2611161017), (-14.6425459564, -17.5), align=None)
        with Locations((0, 14.5)):
            Rectangle(F0_W, F0_H_2)
        with Locations((0, -14.5)):
            Rectangle(F0_W, F0_H_2)
        with Locations((33, 0)):
            Rectangle(F0_W_2, F0_H_3)
        Polygon((25, 9.2611161017), (25, 8.75), (25, 8.2388838983), (25.6425459564, 8.75), align=None)
        Polygon((25.6425459564, -8.75), (25, -8.2388838983), (25, -8.75), (25, -9.2611161017), align=None)
        Polygon((14.6425459564, 17.5), (14, 17.5), (25, 8.75), (25, 9.2611161017), align=None)
        Polygon((25, 8.75), (14, 17.5), (14, 16.9888838983), (24.3574540436, 8.75), (14, 0.5111161017), (14, 0), align=None)
        Polygon((14, 0), (14, 0.5111161017), (13.3574540436, 0), (14, -0.5111161017), align=None)
        Polygon((25, -8.75), (14, 0), (14, -0.5111161017), (24.3574540436, -8.75), (14, -16.9888838983), (14, -17.5), align=None)
        Polygon((25, -9.2611161017), (25, -8.75), (14, -17.5), (14.6425459564, -17.5), align=None)
        Polygon((25, 8.2388838983), (25, 8.75), (14, 0), (25, -8.75), (25, -8.2388838983), (14.6425459564, 0), align=None)
    extrude(amount=F2_DEPTH, mode=Mode.SUBTRACT)

    # F3 (on face) → F4 (cut)
    with BuildSketch(Plane.XY.offset(5)):
        with BuildLine():
            ThreePointArc((-28, 20), (-28.0105084316, 20.2508787808), (-28.0419601085, 20.5))
            ThreePointArc((-28.0419601085, 20.5), (-31, 23), (-33.9580398915, 20.5))
            ThreePointArc((-33.9580398915, 20.5), (-31.2508787808, 17.0105084316), (-28, 20))
        make_face()
        with Locations((-31, 20)):
            Circle(F3_R, mode=Mode.SUBTRACT)
        with BuildLine():
            ThreePointArc((-33.9580398915, -20.5), (-31, -23), (-28.0419601085, -20.5))
            ThreePointArc((-28.0419601085, -20.5), (-28.0105084316, -20.2508787808), (-28, -20))
            ThreePointArc((-28, -20), (-31.2508787808, -17.0105084316), (-33.9580398915, -20.5))
        make_face()
        with Locations((-31, -20)):
            Circle(F3_R, mode=Mode.SUBTRACT)
        with BuildLine():
            ThreePointArc((28.0419601085, -20.5), (31, -23), (33.9580398915, -20.5))
            ThreePointArc((33.9580398915, -20.5), (33.9894915684, -20.2508787808), (34, -20))
            ThreePointArc((34, -20), (30.7491212192, -17.0105084316), (28.0419601085, -20.5))
        make_face()
        with Locations((31, -20)):
            Circle(F3_R, mode=Mode.SUBTRACT)
        with BuildLine():
            ThreePointArc((28.0419601085, 20.5), (30.7491212192, 17.0105084316), (34, 20))
            ThreePointArc((34, 20), (33.9894915684, 20.2508787808), (33.9580398915, 20.5))
            ThreePointArc((33.9580398915, 20.5), (31, 23), (28.0419601085, 20.5))
        make_face()
        with Locations((31, 20)):
            Circle(F3_R, mode=Mode.SUBTRACT)
    extrude(amount=-F4_DEPTH, mode=Mode.SUBTRACT)

    # F5
    f5_edges = [f1.edges().sort_by_distance(p)[0] for p in [
        (25, -17.5, 4),
        (14.642546, -17.5, 4),
        (25, -9.261116, 4),
        (24.357454, -8.75, 4),
        (14, -16.988884, 4),
        (14, -0.511116, 4),
        (25, -8.238884, 4),
        (14.642546, 0, 4),
        (25, 8.238884, 4),
        (14, 0.511116, 4),
        (24.357454, 8.75, 4),
        (14, 16.988884, 4),
        (25, 9.261116, 4),
        (14.642546, 17.5, 4),
        (25, 17.5, 4),
        (-25, 17.5, 4),
        (-25, 8.238884, 4),
        (-25, -9.261116, 4),
        (-25, -17.5, 4),
        (-25, -8.238884, 4),
        (-25, 9.261116, 4),
        (-24.357454, 8.75, 4),
        (-24.357454, -8.75, 4),
        (-14.642546, 0, 4),
        (-14.642546, -17.5, 4),
        (-14.642546, 17.5, 4),
        (-14, 16.988884, 4),
        (-14, -0.511116, 4),
        (-14, 0.511116, 4),
        (-14, -16.988884, 4),
        (-12, -7.5, 4),
        (12, -7.5, 4),
        (12, 7.5, 4),
        (-12, 7.5, 4),
    ]]
    fillet(f5_edges, radius=F5_R)


solid = f1.part
